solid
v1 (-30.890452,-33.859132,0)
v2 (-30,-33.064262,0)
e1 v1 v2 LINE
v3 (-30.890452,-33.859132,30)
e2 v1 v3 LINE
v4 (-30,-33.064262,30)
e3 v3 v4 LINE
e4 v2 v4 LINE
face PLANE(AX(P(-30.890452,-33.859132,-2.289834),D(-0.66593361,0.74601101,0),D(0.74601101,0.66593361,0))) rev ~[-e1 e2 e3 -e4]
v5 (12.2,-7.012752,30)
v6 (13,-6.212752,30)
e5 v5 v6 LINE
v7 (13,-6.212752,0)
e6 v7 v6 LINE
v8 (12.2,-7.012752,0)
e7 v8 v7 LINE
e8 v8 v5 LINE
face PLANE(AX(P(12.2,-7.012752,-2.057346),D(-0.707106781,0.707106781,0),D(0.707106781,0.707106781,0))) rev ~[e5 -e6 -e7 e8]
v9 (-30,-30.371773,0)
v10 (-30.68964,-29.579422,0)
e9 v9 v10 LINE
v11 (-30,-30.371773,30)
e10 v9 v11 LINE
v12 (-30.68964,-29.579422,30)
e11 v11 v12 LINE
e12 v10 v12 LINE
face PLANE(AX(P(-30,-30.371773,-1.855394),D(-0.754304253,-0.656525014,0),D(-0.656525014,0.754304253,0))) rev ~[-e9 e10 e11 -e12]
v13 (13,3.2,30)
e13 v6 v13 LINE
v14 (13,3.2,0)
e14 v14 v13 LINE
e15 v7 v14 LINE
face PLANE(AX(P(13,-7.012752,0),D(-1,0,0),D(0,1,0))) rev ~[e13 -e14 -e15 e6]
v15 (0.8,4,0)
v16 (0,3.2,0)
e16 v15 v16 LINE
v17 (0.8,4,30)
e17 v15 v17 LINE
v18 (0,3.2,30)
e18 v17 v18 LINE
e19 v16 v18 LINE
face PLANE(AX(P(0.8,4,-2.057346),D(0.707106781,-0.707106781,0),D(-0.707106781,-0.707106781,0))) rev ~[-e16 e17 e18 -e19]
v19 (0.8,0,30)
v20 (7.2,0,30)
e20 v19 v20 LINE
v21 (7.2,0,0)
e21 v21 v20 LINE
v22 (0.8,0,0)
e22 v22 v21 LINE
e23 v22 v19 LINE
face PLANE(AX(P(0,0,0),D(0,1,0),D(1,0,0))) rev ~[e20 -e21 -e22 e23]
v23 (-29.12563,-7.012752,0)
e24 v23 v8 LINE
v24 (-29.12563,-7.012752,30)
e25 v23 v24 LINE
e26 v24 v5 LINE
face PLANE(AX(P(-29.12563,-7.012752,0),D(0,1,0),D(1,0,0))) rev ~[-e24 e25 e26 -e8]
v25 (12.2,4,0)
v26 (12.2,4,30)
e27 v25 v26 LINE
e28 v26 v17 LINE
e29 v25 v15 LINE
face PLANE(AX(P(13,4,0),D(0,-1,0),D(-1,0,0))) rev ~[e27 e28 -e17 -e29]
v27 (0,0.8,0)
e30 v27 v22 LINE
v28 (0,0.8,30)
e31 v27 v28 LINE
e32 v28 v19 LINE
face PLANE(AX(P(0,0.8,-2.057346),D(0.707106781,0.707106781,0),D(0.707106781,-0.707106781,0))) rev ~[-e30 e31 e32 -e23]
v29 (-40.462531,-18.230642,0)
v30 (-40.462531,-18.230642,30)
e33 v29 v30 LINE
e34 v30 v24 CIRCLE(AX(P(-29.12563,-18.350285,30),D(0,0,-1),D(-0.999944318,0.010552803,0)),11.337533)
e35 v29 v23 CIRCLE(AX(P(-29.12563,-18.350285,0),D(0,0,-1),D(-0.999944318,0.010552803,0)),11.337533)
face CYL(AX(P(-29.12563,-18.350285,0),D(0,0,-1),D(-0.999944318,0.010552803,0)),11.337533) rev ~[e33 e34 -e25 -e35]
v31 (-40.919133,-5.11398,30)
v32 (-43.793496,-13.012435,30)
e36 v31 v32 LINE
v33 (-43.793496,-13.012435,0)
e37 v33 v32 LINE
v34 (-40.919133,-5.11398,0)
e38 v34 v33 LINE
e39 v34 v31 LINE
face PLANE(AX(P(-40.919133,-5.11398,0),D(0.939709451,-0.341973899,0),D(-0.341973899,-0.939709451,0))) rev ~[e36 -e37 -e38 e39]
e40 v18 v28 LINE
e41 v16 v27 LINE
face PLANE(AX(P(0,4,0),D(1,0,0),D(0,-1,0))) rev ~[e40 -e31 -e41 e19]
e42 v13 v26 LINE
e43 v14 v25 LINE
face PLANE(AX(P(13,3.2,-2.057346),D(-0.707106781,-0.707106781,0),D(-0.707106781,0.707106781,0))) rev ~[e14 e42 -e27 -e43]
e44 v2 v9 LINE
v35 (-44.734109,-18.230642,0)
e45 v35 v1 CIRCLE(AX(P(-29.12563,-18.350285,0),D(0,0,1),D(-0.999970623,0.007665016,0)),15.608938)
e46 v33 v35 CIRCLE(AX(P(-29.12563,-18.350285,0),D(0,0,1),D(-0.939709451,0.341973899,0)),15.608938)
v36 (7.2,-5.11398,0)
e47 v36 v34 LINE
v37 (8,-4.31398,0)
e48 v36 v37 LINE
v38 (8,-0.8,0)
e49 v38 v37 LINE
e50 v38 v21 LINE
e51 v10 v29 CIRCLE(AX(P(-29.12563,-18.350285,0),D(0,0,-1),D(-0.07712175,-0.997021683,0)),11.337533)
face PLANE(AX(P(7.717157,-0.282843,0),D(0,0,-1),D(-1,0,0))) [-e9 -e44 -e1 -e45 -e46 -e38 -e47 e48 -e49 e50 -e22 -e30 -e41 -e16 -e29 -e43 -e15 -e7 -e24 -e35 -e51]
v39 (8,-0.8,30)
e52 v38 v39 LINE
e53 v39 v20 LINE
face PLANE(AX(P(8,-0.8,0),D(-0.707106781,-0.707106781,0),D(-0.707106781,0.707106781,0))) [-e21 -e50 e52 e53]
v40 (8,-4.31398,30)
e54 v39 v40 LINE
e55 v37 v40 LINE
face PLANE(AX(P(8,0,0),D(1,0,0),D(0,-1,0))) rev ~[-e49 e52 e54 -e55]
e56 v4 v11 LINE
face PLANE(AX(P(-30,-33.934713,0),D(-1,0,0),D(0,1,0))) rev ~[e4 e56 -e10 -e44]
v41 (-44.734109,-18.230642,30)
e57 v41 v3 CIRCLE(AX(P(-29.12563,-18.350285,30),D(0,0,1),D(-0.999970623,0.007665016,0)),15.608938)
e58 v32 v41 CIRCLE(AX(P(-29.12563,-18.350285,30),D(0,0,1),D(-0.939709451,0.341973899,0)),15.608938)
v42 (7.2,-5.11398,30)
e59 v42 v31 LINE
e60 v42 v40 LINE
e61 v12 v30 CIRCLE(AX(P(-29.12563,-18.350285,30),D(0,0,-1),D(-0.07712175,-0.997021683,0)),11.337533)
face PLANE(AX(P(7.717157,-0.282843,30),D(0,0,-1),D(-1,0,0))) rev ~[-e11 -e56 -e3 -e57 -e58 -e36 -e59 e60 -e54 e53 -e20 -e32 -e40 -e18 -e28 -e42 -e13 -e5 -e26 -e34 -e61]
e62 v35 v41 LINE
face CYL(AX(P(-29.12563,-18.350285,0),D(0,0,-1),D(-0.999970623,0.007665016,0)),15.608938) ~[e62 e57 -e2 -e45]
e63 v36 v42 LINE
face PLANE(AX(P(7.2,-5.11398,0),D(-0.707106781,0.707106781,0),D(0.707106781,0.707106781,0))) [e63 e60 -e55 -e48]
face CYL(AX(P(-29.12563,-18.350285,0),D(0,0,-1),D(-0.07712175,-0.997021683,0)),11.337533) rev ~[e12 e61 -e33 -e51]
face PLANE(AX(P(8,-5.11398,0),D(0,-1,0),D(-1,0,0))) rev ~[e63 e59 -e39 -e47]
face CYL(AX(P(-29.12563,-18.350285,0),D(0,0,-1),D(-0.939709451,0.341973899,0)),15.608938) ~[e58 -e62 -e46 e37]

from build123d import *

# Parameters (mm, degrees)
F1_DEPTH    = 30
F2_T1_DEPTH = 30
F2_T3_DEPTH = 34.1146927807
F2_T5_DEPTH = 34.5796675935
F2_T7_DEPTH = 33.7107882322


# Not quite as in the source:
# - a fillet or chamfer that OpenCascade refuses, or shapes differently, is made with other operations: its cross-section is extruded or revolved along the edge and cut away or added


with BuildPart() as f1:
    # F0 (on Top) → F1 (new body)
    with BuildSketch(Plane.XY):
        with BuildLine():
            Line((0, 4), (0, 0))
            Line((0, 0), (8, 0))
            Line((8, 0), (8, -5.11398))
            Line((8, -5.11398), (0, -5.11398))
            Line((0, -5.11398), (-30, -5.11398))
            Line((-30, -5.11398), (-40.9191332404, -5.11398))
            Line((-40.9191332404, -5.11398), (-43.7934957599, -13.012435493))
            ThreePointArc((-43.7934957599, -13.012435493), (-44.486999636, -15.5813060668), (-44.7341086379, -18.230641982))
            ThreePointArc((-44.7341086379, -18.230641982), (-40.5087550106, -29.0303309912), (-30, -33.9347131233))
            Line((-30, -33.9347131233), (-30, -29.6540509196))
            ThreePointArc((-30, -29.6540509196), (-37.4863926883, -26.0077839606), (-40.4625312712, -18.230641982))
            ThreePointArc((-40.4625312712, -18.230641982), (-37.1000637613, -10.2912492126), (-29.125629618, -7.0127517826))
            Line((-29.125629618, -7.0127517826), (0, -7.0127517826))
            Line((0, -7.0127517826), (13, -7.0127517826))
            Line((13, -7.0127517826), (13, 4))
            Line((13, 4), (0, 4))
        make_face()
    extrude(amount=F1_DEPTH)

    # F2: chamfer of 0.8 on 8 edges, made by hand

    # F2_s2 → F2_t1 (join)
    with BuildSketch(Plane.XY):
        Polygon((8, -0.8), (7.2, 0), (8, 0), align=None)
        Polygon((7.2, -5.11398), (8, -4.31398), (8, -5.11398), align=None)
    extrude(amount=F2_T1_DEPTH)

    # F2_s4 → F2_t3 (cut)
    with BuildSketch(Plane.XY.offset(-2.0573463904)):
        Polygon((0, 0.8), (0.8, 0), (0, 0), align=None)
        Polygon((0.8, 4), (0, 3.2), (0, 4), align=None)
        Polygon((12.2, -7.0127517826), (13, -6.2127517826), (13, -7.0127517826), align=None)
        Polygon((13, 3.2), (12.2, 4), (13, 4), align=None)
    extrude(amount=F2_T3_DEPTH, mode=Mode.SUBTRACT)

    # F2_s6 → F2_t5 (cut)
    with BuildSketch(Plane.XY.offset(-2.2898337967)):
        with BuildLine():
            Line((-30.8904518842, -33.859131698), (-30, -33.0642616101))
            Line((-30, -33.0642616101), (-30, -33.9347131233))
            ThreePointArc((-30, -33.9347131233), (-30.4567158355, -33.9023630924), (-30.8904518842, -33.859131698))
        make_face()
    extrude(amount=F2_T5_DEPTH, mode=Mode.SUBTRACT)

    # F2_s8 → F2_t7 (cut)
    with BuildSketch(Plane.XY.offset(-1.8553941161)):
        with BuildLine():
            Line((-30, -30.3717734146), (-30.6896401509, -29.5794220382))
            ThreePointArc((-30.6896401509, -29.5794220382), (-30.3570806998, -29.6207408817), (-30, -29.6540509196))
            Line((-30, -29.6540509196), (-30, -30.3717734146))
        make_face()
    extrude(amount=F2_T7_DEPTH, mode=Mode.SUBTRACT)


solid = f1.part
